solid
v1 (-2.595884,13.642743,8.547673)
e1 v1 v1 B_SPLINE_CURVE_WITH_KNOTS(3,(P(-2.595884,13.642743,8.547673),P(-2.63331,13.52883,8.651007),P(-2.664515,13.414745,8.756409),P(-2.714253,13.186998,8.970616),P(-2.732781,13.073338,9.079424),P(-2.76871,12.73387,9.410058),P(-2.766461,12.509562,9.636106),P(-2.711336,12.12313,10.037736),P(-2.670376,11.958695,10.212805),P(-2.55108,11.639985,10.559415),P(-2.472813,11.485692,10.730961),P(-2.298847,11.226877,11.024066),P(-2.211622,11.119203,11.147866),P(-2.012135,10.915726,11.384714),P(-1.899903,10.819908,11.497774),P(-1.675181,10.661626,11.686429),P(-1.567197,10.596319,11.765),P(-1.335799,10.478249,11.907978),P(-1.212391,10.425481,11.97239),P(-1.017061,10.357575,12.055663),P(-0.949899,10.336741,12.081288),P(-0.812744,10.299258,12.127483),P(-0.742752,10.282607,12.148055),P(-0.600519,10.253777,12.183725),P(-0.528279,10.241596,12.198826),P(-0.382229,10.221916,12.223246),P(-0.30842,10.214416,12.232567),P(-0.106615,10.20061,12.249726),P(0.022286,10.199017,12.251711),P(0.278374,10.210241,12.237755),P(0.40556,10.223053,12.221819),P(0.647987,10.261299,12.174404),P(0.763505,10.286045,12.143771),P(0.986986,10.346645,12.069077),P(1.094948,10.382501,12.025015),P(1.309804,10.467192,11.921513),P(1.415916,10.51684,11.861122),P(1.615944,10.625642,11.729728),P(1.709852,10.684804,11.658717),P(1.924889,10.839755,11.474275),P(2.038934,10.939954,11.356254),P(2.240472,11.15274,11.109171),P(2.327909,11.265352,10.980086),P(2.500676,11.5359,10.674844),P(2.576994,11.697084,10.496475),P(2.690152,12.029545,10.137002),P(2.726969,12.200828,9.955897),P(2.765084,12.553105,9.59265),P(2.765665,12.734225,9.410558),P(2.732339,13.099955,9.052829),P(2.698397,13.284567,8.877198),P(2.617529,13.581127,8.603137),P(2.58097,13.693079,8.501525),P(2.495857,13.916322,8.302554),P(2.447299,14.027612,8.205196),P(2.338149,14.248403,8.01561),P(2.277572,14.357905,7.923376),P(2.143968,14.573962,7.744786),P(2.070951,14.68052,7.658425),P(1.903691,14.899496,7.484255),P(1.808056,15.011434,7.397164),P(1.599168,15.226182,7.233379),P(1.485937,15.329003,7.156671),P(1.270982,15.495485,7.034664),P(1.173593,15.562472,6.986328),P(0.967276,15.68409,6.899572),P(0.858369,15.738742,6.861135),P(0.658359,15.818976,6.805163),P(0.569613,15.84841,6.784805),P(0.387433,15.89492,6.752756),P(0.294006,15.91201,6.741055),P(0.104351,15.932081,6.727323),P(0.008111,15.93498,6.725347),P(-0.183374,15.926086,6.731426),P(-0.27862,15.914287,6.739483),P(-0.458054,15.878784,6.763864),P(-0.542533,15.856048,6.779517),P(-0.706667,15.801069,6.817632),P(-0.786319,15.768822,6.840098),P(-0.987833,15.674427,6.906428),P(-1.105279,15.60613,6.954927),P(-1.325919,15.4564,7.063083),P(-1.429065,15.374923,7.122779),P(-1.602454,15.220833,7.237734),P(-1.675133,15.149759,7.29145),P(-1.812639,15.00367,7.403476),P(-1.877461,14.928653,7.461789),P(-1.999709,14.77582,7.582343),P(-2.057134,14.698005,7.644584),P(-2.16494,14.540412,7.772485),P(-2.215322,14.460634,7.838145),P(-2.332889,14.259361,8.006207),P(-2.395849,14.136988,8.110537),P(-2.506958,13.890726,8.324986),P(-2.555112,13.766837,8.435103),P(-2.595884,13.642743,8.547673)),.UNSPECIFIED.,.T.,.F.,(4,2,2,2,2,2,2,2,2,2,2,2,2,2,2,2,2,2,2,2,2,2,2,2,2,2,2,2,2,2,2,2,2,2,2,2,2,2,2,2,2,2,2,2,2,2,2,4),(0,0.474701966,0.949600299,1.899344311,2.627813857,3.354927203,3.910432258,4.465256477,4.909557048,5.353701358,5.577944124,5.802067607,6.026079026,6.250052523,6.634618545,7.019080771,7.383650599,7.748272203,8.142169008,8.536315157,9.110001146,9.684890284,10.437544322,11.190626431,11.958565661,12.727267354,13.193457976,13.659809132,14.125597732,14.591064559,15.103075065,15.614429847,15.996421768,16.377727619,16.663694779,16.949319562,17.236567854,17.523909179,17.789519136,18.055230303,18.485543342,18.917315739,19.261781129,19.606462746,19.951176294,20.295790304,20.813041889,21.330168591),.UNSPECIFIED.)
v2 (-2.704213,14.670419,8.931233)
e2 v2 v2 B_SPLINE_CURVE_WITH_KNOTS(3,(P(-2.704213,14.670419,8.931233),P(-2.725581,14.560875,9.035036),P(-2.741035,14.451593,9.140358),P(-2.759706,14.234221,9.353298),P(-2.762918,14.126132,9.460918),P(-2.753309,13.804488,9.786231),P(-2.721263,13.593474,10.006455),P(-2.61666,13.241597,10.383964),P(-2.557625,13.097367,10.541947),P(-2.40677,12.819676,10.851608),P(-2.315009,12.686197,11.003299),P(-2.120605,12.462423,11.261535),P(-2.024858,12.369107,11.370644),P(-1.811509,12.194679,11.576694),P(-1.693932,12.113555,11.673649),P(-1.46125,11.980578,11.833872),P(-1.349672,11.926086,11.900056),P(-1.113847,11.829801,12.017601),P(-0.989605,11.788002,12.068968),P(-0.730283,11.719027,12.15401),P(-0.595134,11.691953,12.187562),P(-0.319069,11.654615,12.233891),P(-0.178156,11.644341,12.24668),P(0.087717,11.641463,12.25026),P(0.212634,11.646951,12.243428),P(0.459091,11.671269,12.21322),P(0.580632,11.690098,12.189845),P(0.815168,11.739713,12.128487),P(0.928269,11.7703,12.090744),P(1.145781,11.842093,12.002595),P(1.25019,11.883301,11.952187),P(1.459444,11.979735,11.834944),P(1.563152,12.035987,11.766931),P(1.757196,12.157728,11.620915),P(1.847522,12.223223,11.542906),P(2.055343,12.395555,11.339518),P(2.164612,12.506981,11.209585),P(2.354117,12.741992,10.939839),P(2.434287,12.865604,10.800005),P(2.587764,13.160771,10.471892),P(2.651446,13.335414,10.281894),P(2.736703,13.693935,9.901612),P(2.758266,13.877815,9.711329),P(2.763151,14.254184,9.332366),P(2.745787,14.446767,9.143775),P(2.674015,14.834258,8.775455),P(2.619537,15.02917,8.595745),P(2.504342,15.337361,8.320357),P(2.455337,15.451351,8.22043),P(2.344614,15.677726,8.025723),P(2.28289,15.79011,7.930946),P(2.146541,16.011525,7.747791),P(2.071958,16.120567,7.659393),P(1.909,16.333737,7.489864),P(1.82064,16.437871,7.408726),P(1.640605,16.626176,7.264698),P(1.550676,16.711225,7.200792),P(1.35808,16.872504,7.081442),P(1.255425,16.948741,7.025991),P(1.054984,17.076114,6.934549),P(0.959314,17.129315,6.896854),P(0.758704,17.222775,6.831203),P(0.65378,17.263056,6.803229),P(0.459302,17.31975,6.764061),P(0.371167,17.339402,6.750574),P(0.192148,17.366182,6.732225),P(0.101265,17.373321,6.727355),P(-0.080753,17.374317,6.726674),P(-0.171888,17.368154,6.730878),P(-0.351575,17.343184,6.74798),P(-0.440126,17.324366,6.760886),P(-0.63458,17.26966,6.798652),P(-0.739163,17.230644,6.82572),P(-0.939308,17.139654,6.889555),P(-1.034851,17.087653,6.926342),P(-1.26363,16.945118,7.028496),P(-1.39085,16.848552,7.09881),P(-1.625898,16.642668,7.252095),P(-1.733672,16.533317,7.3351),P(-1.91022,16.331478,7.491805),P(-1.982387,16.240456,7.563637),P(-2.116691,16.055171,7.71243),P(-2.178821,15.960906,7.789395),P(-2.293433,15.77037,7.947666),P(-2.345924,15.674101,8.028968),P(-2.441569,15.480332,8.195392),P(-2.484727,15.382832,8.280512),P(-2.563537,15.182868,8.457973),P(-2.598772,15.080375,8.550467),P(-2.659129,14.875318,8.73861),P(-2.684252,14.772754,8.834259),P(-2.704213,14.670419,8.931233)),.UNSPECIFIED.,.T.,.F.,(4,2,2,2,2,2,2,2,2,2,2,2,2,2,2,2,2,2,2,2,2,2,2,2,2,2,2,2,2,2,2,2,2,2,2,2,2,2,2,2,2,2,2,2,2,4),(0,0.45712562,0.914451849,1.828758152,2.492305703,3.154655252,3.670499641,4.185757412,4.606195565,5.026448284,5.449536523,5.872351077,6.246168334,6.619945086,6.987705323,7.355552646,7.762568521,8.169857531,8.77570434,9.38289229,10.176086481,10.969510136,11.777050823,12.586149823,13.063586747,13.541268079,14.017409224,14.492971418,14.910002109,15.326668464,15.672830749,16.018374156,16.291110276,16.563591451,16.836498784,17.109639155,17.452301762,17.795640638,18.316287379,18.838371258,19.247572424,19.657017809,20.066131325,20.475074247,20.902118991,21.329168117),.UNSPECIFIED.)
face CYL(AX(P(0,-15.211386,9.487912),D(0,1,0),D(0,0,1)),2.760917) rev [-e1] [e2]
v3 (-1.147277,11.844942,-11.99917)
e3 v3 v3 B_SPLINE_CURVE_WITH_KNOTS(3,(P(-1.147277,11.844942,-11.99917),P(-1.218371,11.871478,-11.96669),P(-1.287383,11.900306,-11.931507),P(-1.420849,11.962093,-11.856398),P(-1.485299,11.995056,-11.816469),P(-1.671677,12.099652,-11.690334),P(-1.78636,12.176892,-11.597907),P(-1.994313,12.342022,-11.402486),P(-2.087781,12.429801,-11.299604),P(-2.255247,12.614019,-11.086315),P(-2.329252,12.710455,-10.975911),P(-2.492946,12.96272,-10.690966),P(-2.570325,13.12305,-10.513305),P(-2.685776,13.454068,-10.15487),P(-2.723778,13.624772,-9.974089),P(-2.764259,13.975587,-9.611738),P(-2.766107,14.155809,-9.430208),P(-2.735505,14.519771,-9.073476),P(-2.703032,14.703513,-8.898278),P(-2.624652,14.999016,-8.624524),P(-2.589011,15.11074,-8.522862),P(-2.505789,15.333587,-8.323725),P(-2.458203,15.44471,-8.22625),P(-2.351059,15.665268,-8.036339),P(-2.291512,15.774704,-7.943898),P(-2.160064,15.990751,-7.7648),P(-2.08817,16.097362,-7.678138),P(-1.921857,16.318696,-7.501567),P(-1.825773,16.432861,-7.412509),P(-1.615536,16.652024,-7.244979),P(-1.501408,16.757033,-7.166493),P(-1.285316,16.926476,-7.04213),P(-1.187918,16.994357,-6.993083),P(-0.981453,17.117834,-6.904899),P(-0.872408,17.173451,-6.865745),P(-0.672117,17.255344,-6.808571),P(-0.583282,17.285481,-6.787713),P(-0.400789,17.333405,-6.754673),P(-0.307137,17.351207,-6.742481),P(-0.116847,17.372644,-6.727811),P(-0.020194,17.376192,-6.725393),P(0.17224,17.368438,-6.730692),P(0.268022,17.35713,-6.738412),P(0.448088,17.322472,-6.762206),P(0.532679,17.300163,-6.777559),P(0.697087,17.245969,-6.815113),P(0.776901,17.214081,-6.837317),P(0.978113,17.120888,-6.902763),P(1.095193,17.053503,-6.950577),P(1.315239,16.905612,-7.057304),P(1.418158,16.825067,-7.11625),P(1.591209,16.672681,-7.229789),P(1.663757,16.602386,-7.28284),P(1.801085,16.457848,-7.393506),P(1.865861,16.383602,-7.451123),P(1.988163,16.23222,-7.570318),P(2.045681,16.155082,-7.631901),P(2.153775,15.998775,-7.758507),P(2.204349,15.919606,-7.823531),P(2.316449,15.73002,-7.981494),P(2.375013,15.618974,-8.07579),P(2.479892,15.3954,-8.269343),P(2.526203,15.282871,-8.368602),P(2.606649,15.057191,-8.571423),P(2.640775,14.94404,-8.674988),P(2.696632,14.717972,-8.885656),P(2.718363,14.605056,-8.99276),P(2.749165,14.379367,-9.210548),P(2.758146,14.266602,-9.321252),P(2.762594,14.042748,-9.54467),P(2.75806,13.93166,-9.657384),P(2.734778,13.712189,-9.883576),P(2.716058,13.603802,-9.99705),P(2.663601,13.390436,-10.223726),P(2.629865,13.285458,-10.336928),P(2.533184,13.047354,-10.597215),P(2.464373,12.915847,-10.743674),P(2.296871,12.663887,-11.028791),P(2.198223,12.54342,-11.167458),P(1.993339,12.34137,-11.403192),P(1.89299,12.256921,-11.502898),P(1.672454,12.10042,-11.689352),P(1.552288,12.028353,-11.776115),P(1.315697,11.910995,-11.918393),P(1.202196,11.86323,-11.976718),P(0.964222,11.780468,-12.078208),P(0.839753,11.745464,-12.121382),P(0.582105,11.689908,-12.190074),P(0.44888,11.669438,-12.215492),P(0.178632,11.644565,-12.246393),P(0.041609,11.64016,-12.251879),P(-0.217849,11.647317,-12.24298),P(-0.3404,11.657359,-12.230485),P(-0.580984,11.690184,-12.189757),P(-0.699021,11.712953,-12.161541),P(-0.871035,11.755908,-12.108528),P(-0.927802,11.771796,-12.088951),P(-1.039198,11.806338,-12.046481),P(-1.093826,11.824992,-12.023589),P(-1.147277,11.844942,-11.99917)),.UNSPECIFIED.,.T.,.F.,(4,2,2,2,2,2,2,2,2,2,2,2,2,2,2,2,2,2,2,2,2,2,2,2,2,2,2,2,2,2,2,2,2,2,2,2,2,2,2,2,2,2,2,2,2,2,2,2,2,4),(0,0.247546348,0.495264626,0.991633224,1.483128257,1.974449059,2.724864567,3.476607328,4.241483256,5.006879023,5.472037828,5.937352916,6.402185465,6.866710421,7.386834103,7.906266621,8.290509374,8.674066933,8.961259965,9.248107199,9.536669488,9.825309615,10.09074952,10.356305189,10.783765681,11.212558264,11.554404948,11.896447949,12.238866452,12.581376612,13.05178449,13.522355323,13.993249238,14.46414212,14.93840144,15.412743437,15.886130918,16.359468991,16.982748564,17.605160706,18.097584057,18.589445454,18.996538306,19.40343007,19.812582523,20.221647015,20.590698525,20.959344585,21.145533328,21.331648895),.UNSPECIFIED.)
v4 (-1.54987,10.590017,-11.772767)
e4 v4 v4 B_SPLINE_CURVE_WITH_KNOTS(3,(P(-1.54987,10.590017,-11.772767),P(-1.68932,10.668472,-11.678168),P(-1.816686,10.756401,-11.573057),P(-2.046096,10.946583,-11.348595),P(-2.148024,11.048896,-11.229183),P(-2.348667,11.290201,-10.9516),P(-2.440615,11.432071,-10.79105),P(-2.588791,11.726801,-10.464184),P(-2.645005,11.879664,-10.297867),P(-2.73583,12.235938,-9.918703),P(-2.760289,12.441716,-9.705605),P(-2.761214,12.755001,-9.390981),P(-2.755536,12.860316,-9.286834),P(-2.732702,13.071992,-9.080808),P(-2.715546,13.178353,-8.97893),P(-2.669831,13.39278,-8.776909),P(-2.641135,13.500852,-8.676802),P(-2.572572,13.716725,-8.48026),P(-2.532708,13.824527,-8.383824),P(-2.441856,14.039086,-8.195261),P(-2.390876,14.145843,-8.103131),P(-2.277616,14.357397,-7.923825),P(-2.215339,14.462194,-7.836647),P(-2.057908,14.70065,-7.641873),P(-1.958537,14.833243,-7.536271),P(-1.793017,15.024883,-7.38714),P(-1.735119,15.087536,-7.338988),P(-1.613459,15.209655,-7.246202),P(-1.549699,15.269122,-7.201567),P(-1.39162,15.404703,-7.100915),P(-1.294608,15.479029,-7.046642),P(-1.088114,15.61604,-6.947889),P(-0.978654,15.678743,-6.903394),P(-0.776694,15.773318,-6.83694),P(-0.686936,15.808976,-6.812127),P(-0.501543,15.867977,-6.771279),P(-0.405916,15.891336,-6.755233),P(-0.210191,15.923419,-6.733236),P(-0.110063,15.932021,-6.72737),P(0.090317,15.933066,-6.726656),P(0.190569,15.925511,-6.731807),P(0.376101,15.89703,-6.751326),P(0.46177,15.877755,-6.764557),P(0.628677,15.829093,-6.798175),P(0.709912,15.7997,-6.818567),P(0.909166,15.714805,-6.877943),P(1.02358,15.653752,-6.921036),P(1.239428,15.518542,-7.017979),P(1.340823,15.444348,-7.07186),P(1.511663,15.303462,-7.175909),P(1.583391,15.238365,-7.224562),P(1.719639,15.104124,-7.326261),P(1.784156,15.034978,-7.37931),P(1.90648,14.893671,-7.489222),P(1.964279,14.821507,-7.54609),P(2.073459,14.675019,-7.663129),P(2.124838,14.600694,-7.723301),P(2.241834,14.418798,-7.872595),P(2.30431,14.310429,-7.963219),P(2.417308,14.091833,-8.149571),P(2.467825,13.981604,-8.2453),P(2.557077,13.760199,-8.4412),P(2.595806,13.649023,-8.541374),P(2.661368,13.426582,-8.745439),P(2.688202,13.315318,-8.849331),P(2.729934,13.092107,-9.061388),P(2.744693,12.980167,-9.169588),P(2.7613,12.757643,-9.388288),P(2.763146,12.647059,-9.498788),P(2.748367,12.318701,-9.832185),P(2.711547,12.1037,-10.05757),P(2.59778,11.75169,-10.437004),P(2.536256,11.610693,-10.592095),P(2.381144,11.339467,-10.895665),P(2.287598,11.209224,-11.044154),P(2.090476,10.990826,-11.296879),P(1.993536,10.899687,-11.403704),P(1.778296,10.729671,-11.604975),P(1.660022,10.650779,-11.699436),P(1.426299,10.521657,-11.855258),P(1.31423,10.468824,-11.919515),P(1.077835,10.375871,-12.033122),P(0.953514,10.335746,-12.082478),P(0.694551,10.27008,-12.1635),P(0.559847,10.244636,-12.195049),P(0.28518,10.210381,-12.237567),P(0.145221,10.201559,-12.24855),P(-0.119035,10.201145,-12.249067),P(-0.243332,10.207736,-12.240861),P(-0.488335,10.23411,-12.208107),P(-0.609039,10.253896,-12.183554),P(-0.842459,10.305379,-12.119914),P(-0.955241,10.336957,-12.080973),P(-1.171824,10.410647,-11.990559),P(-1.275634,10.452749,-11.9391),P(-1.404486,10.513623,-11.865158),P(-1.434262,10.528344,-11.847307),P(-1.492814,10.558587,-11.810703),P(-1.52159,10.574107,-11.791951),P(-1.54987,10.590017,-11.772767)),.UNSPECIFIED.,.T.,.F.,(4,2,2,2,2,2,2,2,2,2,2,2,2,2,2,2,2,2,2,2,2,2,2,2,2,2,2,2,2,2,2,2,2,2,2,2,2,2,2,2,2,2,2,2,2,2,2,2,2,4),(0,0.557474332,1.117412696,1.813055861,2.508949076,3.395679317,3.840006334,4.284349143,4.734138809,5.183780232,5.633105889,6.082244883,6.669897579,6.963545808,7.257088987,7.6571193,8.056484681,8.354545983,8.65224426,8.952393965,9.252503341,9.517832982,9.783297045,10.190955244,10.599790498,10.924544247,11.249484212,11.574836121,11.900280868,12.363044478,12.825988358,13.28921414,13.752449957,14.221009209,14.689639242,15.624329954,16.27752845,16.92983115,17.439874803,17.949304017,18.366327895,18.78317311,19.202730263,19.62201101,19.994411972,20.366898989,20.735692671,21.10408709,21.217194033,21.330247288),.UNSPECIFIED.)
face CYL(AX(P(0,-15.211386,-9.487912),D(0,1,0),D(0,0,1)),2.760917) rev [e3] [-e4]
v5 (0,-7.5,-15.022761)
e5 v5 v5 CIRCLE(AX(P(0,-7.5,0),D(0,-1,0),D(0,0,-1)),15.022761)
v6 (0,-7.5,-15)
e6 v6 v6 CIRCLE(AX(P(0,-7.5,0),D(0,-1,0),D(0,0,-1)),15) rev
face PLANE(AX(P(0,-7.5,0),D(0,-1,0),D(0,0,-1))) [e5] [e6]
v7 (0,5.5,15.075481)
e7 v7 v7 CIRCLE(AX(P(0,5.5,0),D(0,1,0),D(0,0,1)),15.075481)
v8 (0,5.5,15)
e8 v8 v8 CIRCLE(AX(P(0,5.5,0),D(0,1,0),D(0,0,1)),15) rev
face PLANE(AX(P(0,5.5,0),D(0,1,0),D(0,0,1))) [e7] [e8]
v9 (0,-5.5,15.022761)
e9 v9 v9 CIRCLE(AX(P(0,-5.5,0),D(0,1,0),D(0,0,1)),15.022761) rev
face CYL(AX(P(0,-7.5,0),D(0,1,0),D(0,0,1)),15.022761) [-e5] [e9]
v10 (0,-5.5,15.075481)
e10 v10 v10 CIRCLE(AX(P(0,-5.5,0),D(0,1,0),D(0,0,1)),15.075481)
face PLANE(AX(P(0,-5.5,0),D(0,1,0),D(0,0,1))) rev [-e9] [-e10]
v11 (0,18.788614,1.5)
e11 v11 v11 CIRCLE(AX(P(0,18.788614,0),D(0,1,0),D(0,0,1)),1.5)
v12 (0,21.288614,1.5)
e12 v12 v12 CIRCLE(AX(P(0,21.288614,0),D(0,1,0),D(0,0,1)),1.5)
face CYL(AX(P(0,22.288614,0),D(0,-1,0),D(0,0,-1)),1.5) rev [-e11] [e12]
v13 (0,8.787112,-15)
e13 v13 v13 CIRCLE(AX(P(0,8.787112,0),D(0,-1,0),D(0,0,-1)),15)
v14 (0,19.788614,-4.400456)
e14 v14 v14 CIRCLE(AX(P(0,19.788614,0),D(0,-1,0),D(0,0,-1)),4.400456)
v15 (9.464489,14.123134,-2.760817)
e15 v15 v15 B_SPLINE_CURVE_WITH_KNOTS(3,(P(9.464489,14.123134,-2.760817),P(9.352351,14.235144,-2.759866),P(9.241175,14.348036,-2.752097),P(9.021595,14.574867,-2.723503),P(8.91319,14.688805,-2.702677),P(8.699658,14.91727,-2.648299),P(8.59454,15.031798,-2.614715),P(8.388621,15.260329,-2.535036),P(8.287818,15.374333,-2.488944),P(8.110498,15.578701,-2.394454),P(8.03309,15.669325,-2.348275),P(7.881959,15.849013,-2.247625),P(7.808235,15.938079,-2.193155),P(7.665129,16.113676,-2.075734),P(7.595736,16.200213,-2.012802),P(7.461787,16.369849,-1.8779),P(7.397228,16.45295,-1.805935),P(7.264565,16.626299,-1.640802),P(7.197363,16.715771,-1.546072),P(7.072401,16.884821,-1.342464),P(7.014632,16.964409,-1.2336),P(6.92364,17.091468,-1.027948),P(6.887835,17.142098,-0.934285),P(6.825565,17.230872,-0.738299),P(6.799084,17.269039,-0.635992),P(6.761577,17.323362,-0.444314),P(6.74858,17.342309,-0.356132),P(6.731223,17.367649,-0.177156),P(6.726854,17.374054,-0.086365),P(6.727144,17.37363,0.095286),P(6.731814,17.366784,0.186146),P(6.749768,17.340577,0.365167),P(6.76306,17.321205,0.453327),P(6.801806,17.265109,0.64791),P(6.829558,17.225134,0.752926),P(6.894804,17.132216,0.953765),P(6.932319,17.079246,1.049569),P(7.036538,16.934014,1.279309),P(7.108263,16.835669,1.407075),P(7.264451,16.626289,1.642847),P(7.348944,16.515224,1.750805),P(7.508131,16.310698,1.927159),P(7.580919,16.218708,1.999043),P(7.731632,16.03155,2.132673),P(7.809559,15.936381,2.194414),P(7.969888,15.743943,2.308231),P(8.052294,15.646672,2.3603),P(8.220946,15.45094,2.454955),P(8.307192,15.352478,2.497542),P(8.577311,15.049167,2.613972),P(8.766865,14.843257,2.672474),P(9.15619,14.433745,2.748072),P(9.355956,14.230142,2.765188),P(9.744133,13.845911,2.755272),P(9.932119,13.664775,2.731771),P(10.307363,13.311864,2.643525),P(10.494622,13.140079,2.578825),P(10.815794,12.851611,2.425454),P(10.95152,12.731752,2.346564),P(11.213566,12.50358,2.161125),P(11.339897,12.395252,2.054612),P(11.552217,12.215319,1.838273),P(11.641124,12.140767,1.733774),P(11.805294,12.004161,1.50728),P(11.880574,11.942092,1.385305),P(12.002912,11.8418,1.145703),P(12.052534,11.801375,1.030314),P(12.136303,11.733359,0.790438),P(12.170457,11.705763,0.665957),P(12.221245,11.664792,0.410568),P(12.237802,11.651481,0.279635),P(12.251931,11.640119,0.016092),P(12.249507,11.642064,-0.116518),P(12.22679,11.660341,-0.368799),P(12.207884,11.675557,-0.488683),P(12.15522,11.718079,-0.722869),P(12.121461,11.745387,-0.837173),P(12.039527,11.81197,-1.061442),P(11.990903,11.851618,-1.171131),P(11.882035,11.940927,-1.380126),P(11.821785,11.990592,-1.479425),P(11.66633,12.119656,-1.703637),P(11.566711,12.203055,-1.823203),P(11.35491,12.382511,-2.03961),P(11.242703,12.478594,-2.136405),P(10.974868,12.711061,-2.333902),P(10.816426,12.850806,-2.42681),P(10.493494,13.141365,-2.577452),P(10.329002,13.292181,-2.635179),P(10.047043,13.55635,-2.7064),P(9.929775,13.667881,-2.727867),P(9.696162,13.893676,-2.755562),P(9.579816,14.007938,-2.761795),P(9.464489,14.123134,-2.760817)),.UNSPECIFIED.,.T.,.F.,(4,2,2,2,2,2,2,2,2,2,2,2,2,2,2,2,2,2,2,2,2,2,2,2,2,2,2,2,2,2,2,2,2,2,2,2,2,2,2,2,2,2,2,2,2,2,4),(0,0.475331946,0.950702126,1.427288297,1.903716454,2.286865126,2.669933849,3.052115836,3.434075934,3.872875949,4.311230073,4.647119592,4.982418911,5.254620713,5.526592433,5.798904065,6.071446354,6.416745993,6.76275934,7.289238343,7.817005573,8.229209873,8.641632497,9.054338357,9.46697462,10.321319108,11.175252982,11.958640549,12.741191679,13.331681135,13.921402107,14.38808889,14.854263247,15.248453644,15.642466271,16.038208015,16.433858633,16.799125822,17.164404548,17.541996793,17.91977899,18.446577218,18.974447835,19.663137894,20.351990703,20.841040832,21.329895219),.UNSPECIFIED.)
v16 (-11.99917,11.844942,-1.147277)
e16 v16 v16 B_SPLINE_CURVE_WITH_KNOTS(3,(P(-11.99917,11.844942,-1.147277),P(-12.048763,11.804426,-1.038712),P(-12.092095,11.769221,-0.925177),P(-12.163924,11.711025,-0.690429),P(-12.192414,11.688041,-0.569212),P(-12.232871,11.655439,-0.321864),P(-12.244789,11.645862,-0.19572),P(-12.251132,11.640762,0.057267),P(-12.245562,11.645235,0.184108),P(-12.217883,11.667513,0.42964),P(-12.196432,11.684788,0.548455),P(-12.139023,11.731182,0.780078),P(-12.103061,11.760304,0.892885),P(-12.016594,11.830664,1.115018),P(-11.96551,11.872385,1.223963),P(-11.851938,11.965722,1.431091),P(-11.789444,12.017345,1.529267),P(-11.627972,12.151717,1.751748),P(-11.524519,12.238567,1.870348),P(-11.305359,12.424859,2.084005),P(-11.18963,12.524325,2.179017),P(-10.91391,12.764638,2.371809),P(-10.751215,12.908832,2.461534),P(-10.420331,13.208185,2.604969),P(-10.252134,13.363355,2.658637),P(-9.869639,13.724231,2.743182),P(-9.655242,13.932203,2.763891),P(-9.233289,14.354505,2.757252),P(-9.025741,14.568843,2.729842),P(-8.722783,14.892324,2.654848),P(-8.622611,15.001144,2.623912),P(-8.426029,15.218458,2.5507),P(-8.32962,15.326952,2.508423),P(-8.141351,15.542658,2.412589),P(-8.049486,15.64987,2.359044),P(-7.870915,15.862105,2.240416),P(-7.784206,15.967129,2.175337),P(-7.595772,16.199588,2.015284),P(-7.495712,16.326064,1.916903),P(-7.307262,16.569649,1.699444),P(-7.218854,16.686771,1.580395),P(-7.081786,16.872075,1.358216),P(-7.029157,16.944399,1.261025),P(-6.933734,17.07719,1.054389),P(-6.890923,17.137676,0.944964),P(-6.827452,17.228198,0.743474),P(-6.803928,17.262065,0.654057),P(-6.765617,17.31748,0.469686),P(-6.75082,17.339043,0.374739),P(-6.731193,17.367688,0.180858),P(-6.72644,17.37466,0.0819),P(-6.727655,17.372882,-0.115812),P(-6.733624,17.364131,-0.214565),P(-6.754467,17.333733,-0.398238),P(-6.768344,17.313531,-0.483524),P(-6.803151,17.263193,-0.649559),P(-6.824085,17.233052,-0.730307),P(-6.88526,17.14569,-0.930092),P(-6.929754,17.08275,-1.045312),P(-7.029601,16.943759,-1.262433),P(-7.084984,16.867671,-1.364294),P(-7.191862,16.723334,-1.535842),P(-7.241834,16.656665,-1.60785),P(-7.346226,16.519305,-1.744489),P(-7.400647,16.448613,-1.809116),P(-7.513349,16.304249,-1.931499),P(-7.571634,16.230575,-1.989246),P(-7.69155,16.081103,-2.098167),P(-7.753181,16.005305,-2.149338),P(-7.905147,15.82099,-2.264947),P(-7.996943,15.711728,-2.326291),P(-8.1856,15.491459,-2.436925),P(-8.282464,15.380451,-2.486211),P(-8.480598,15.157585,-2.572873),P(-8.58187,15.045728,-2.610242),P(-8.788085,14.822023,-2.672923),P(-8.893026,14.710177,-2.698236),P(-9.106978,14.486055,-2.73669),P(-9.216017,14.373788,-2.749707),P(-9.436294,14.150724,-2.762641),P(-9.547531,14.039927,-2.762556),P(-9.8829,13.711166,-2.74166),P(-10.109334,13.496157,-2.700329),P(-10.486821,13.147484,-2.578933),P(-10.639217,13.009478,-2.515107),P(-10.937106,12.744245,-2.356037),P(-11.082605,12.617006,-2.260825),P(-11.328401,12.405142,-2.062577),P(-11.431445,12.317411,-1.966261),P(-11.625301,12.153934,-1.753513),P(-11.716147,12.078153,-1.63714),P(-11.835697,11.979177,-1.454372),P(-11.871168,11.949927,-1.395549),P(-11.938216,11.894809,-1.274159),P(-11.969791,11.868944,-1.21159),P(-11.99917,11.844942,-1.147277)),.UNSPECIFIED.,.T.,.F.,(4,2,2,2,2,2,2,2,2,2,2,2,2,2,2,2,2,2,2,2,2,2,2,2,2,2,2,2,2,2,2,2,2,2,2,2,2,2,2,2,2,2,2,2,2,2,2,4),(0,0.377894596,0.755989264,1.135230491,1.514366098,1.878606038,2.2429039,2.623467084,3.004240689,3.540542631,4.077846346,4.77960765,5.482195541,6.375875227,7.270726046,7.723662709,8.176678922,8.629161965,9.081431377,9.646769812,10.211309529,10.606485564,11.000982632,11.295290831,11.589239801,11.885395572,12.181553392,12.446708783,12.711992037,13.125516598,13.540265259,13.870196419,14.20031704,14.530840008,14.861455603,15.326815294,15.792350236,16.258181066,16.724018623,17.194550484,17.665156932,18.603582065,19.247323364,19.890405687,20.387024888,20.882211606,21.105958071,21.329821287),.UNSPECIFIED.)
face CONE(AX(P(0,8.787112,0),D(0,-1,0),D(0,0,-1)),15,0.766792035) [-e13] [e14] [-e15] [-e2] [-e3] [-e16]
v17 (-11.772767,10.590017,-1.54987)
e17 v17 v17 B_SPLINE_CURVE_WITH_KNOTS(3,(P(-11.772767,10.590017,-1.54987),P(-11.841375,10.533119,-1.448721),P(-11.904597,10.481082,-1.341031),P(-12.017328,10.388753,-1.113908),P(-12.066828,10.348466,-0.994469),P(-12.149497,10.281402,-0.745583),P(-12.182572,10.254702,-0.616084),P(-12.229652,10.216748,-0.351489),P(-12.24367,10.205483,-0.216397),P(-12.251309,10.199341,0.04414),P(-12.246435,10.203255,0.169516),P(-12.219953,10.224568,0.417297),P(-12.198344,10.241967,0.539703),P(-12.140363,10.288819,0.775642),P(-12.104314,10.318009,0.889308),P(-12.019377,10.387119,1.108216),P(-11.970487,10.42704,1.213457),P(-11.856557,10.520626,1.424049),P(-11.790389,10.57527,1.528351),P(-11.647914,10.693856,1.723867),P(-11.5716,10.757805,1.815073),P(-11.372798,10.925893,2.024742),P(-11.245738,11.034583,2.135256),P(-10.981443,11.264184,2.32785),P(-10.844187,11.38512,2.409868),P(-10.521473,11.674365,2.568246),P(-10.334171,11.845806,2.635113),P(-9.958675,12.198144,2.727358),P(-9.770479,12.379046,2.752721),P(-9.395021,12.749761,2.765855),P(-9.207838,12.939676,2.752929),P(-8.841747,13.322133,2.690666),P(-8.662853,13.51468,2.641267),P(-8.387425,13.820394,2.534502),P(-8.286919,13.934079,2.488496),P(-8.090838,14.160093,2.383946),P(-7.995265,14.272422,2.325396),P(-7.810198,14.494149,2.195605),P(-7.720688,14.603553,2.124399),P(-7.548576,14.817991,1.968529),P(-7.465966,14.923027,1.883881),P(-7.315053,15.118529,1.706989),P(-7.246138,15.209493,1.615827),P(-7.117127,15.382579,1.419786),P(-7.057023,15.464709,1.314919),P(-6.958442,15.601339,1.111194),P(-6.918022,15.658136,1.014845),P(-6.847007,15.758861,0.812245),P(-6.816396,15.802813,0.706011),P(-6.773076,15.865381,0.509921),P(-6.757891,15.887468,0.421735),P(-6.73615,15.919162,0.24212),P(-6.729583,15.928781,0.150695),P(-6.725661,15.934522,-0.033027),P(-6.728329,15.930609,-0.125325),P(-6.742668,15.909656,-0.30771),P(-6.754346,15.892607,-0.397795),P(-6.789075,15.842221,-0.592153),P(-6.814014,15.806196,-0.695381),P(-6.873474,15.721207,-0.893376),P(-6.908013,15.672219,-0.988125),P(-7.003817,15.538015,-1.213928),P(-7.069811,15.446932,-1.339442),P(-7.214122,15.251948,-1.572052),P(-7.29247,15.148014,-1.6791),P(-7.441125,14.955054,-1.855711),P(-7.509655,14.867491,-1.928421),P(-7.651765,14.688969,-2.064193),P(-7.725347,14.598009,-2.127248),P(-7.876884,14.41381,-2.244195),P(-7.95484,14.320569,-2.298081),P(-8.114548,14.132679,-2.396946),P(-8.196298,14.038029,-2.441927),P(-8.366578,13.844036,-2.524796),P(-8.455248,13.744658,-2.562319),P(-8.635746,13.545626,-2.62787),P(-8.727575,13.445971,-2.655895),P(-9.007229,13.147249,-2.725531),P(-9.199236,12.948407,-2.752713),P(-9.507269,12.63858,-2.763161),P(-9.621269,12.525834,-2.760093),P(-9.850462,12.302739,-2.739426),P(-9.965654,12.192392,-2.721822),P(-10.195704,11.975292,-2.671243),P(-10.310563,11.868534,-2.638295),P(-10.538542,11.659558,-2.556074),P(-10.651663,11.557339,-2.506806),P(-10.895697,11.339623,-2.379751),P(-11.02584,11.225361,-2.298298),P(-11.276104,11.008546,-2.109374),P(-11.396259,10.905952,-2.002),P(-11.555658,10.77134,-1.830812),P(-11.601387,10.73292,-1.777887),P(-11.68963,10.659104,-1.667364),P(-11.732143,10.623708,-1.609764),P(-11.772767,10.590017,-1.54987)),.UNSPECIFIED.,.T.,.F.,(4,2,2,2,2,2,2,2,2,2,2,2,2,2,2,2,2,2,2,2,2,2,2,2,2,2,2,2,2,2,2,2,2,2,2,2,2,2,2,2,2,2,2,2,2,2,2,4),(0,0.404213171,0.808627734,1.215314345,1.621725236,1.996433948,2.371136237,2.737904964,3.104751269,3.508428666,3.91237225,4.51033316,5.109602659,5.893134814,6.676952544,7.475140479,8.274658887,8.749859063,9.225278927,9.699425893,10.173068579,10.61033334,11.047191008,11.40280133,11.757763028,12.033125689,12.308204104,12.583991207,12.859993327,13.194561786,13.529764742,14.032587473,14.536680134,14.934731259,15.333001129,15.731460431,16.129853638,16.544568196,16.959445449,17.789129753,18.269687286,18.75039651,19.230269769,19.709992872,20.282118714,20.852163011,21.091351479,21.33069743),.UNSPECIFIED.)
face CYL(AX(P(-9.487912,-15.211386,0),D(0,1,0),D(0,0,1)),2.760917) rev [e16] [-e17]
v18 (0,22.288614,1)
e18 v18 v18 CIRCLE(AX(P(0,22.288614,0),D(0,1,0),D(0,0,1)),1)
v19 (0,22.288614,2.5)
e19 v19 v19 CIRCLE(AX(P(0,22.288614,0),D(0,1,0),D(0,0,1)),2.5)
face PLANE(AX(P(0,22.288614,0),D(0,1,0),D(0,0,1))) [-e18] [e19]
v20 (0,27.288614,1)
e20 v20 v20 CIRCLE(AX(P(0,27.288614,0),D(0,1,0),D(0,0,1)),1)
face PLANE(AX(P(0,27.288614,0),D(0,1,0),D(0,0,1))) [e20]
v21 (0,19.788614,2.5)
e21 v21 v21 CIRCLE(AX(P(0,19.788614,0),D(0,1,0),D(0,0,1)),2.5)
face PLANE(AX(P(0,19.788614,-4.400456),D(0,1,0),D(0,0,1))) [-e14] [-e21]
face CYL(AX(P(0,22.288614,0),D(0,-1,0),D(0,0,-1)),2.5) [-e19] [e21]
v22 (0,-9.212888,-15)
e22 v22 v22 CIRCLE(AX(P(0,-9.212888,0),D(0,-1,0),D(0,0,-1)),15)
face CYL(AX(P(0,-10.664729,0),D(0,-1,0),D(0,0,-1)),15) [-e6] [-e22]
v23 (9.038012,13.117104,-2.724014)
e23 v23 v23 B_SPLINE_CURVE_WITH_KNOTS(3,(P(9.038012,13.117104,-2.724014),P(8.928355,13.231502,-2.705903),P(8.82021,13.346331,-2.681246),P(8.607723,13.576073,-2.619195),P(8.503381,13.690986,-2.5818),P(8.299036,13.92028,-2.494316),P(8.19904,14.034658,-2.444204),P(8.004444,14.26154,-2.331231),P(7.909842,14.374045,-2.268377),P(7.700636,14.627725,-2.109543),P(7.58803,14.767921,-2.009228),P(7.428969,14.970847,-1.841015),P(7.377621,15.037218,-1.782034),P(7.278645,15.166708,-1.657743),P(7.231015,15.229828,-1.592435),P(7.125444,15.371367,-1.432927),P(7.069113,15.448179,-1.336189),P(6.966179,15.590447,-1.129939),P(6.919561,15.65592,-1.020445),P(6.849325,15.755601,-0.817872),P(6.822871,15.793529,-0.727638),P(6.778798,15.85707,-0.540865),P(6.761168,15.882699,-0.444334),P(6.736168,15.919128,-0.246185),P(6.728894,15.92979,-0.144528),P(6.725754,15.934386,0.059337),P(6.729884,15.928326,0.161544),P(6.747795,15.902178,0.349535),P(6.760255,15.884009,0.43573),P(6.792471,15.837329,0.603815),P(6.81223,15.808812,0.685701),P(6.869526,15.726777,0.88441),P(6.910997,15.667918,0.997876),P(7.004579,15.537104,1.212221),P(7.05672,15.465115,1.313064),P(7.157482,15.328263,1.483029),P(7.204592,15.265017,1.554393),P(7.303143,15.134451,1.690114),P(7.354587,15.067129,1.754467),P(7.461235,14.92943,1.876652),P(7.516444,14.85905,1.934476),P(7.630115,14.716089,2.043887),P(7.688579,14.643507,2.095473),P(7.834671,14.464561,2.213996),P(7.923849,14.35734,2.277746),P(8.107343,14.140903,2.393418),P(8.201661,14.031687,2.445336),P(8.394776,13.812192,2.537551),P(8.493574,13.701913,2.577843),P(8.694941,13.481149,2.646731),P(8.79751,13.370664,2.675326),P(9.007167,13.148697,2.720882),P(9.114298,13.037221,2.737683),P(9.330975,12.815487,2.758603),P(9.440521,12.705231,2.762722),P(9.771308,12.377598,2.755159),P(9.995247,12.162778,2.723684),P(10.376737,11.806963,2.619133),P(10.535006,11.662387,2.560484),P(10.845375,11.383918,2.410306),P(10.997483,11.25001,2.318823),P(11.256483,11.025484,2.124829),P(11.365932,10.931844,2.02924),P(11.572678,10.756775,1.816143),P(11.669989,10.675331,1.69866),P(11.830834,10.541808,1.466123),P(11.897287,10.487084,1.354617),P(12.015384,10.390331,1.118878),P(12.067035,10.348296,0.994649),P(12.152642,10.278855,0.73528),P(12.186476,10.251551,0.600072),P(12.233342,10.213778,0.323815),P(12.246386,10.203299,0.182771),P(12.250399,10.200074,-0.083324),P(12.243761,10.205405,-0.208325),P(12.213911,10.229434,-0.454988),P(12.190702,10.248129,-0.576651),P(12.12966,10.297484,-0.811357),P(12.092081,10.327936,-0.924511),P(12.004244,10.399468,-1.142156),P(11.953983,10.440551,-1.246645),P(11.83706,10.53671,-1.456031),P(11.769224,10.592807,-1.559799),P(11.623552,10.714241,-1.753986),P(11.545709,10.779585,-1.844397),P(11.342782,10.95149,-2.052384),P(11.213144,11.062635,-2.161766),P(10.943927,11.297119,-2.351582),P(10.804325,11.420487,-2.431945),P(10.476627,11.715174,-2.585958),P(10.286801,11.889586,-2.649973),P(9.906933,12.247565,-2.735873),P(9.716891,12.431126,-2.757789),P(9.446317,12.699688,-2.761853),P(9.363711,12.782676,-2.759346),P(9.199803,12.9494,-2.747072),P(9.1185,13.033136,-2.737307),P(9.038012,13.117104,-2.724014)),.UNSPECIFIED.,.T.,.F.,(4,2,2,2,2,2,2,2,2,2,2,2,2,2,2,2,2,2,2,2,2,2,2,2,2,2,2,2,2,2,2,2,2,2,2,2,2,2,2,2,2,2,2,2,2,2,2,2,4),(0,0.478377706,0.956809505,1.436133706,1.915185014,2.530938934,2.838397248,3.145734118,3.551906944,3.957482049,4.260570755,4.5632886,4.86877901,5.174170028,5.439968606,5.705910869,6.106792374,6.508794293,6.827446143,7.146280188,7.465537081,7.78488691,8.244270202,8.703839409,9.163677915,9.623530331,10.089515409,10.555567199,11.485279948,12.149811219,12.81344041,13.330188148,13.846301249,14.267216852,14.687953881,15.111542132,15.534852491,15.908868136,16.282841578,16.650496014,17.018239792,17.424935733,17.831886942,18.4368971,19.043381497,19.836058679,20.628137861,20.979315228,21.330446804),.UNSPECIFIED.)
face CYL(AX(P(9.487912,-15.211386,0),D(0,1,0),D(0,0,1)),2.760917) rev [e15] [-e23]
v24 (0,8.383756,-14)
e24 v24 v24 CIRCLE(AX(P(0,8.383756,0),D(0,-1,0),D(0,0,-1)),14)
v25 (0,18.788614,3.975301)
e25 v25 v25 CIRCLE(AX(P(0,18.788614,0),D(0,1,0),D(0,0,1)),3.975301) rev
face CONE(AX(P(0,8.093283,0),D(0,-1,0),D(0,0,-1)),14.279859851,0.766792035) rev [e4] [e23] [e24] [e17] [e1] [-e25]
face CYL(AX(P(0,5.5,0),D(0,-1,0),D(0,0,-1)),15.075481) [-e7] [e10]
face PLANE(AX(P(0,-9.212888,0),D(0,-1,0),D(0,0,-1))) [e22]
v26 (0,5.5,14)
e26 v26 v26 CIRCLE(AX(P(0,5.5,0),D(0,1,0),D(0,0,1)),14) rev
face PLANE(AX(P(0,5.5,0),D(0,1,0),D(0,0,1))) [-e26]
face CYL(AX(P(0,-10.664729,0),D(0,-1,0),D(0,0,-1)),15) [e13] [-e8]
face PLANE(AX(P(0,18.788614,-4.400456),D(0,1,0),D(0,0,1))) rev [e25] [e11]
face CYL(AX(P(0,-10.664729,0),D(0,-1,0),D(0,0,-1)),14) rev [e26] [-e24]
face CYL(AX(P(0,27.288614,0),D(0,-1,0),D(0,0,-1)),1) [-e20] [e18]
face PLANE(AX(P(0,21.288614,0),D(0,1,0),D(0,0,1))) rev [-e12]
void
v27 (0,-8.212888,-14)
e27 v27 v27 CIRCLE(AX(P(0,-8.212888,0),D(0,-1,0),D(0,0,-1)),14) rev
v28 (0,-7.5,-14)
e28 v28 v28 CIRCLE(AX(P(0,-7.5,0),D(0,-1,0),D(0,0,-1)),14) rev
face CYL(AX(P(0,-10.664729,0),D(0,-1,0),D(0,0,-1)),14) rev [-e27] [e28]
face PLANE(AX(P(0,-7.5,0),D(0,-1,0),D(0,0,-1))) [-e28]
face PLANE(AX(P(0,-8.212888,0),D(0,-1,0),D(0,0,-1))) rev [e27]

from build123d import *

# Parameters (mm, degrees)
CROQUIS3_R              = 2.5
SALIENTE_EXTRUIR1_DEPTH = 2.5
CROQUIS4_R              = 1
SALIENTE_EXTRUIR2_DEPTH = 5
CROQUIS6_R              = 2.760916645
CORTAR_EXTRUIR1_DEPTH   = 35
SALIENTE_EXTRUIR3_START = -1
CROQUIS7_R              = 14
SALIENTE_EXTRUIR3_DEPTH = 1
CROQUIS8_R              = 15.075481364
SALIENTE_EXTRUIR4_DEPTH = 5.5
CROQUIS9_R              = 15.022760534
SALIENTE_EXTRUIR5_DEPTH = 2


# Read off the part's stored shape, not the designer's step: Vaciado1
with BuildPart() as part:
    # Croquis2 → Revolución1 (revolve)
    with BuildSketch(Plane(origin=(0, 0, 0), x_dir=(0, 0, -1), z_dir=(1, 0, 0))):
        Polygon((0, -9.212888184), (15, -9.212888184), (15, 8.787111816), (4.400455902, 19.788614132), (0, 19.788614132), align=None)
    revolve(axis=Axis((0, -10.664729222, 0), (0, 1, 0)))

    # Croquis3 → Saliente-Extruir1 (add)
    with BuildSketch(Plane(origin=(0, 19.788614132, 0), x_dir=(1, 0, 0), z_dir=(0, 1, 0))):
        with Locations(Location((0, 0, 0), (0, 0, 270))):
            Circle(CROQUIS3_R)
    extrude(amount=SALIENTE_EXTRUIR1_DEPTH)

    # Croquis4 → Saliente-Extruir2 (add)
    with BuildSketch(Plane(origin=(0, 22.288614132, 0), x_dir=(1, 0, 0), z_dir=(0, 1, 0))):
        with Locations(Location((0, 0, 0), (0, 0, 270))):
            Circle(CROQUIS4_R)
    extrude(amount=SALIENTE_EXTRUIR2_DEPTH)

    # Vaciado1 outline → Vaciado1 (revolve, cut)
    with BuildSketch(Plane.XY):
        Polygon((14, -9.212888184), (14, 8.383755945), (3.975300644, 18.788614132), (1.5, 18.788614132), (1.5, 21.288614132), (0, 21.288614132), (0, -9.212888184), align=None)
    revolve(axis=Axis((0, 0, 0), (0, 1, 0)), mode=Mode.SUBTRACT)

    # Croquis6 → Cortar-Extruir1 (cut)
    with BuildSketch(Plane(origin=(0, 19.788614132, 0), x_dir=(1, 0, 0), z_dir=(0, 1, 0))):
        with Locations(Location((0, -9.487911963, 0), (0, 0, 168.367798153))):
            Circle(CROQUIS6_R)
        with Locations(Location((-9.487911963, 0, 0), (0, 0, 155.446542586))):
            Circle(CROQUIS6_R)
        with Locations(Location((0, 9.487911963, 0), (0, 0, 270.000000733))):
            Circle(CROQUIS6_R)
        with Locations(Location((9.487911963, 0, 0), (0, 0, 99.378357768))):
            Circle(CROQUIS6_R)
    extrude(amount=-CORTAR_EXTRUIR1_DEPTH, mode=Mode.SUBTRACT)

    # Croquis7 → Saliente-Extruir3 (add)
    with BuildSketch(Plane.XZ.offset(9.212888184).offset(SALIENTE_EXTRUIR3_START)):
        with Locations(Location((0, 0, 0), (0, 0, 270))):
            Circle(CROQUIS7_R)
    extrude(amount=SALIENTE_EXTRUIR3_DEPTH)

    # Croquis8 → Saliente-Extruir4 (add, symmetric)
    with BuildSketch(Plane(origin=(0, 0, 0), x_dir=(1, 0, 0), z_dir=(0, 1, 0))):
        with Locations(Location((0, 0, 0), (0, 0, 270))):
            Circle(CROQUIS8_R)
    extrude(amount=SALIENTE_EXTRUIR4_DEPTH, both=True)

    # Croquis9 → Saliente-Extruir5 (add)
    with BuildSketch(Plane.XZ.offset(5.5)):
        with Locations(Location((0, 0, 0), (0, 0, 90))):
            Circle(CROQUIS9_R)
    extrude(amount=SALIENTE_EXTRUIR5_DEPTH)


solid = part.part
